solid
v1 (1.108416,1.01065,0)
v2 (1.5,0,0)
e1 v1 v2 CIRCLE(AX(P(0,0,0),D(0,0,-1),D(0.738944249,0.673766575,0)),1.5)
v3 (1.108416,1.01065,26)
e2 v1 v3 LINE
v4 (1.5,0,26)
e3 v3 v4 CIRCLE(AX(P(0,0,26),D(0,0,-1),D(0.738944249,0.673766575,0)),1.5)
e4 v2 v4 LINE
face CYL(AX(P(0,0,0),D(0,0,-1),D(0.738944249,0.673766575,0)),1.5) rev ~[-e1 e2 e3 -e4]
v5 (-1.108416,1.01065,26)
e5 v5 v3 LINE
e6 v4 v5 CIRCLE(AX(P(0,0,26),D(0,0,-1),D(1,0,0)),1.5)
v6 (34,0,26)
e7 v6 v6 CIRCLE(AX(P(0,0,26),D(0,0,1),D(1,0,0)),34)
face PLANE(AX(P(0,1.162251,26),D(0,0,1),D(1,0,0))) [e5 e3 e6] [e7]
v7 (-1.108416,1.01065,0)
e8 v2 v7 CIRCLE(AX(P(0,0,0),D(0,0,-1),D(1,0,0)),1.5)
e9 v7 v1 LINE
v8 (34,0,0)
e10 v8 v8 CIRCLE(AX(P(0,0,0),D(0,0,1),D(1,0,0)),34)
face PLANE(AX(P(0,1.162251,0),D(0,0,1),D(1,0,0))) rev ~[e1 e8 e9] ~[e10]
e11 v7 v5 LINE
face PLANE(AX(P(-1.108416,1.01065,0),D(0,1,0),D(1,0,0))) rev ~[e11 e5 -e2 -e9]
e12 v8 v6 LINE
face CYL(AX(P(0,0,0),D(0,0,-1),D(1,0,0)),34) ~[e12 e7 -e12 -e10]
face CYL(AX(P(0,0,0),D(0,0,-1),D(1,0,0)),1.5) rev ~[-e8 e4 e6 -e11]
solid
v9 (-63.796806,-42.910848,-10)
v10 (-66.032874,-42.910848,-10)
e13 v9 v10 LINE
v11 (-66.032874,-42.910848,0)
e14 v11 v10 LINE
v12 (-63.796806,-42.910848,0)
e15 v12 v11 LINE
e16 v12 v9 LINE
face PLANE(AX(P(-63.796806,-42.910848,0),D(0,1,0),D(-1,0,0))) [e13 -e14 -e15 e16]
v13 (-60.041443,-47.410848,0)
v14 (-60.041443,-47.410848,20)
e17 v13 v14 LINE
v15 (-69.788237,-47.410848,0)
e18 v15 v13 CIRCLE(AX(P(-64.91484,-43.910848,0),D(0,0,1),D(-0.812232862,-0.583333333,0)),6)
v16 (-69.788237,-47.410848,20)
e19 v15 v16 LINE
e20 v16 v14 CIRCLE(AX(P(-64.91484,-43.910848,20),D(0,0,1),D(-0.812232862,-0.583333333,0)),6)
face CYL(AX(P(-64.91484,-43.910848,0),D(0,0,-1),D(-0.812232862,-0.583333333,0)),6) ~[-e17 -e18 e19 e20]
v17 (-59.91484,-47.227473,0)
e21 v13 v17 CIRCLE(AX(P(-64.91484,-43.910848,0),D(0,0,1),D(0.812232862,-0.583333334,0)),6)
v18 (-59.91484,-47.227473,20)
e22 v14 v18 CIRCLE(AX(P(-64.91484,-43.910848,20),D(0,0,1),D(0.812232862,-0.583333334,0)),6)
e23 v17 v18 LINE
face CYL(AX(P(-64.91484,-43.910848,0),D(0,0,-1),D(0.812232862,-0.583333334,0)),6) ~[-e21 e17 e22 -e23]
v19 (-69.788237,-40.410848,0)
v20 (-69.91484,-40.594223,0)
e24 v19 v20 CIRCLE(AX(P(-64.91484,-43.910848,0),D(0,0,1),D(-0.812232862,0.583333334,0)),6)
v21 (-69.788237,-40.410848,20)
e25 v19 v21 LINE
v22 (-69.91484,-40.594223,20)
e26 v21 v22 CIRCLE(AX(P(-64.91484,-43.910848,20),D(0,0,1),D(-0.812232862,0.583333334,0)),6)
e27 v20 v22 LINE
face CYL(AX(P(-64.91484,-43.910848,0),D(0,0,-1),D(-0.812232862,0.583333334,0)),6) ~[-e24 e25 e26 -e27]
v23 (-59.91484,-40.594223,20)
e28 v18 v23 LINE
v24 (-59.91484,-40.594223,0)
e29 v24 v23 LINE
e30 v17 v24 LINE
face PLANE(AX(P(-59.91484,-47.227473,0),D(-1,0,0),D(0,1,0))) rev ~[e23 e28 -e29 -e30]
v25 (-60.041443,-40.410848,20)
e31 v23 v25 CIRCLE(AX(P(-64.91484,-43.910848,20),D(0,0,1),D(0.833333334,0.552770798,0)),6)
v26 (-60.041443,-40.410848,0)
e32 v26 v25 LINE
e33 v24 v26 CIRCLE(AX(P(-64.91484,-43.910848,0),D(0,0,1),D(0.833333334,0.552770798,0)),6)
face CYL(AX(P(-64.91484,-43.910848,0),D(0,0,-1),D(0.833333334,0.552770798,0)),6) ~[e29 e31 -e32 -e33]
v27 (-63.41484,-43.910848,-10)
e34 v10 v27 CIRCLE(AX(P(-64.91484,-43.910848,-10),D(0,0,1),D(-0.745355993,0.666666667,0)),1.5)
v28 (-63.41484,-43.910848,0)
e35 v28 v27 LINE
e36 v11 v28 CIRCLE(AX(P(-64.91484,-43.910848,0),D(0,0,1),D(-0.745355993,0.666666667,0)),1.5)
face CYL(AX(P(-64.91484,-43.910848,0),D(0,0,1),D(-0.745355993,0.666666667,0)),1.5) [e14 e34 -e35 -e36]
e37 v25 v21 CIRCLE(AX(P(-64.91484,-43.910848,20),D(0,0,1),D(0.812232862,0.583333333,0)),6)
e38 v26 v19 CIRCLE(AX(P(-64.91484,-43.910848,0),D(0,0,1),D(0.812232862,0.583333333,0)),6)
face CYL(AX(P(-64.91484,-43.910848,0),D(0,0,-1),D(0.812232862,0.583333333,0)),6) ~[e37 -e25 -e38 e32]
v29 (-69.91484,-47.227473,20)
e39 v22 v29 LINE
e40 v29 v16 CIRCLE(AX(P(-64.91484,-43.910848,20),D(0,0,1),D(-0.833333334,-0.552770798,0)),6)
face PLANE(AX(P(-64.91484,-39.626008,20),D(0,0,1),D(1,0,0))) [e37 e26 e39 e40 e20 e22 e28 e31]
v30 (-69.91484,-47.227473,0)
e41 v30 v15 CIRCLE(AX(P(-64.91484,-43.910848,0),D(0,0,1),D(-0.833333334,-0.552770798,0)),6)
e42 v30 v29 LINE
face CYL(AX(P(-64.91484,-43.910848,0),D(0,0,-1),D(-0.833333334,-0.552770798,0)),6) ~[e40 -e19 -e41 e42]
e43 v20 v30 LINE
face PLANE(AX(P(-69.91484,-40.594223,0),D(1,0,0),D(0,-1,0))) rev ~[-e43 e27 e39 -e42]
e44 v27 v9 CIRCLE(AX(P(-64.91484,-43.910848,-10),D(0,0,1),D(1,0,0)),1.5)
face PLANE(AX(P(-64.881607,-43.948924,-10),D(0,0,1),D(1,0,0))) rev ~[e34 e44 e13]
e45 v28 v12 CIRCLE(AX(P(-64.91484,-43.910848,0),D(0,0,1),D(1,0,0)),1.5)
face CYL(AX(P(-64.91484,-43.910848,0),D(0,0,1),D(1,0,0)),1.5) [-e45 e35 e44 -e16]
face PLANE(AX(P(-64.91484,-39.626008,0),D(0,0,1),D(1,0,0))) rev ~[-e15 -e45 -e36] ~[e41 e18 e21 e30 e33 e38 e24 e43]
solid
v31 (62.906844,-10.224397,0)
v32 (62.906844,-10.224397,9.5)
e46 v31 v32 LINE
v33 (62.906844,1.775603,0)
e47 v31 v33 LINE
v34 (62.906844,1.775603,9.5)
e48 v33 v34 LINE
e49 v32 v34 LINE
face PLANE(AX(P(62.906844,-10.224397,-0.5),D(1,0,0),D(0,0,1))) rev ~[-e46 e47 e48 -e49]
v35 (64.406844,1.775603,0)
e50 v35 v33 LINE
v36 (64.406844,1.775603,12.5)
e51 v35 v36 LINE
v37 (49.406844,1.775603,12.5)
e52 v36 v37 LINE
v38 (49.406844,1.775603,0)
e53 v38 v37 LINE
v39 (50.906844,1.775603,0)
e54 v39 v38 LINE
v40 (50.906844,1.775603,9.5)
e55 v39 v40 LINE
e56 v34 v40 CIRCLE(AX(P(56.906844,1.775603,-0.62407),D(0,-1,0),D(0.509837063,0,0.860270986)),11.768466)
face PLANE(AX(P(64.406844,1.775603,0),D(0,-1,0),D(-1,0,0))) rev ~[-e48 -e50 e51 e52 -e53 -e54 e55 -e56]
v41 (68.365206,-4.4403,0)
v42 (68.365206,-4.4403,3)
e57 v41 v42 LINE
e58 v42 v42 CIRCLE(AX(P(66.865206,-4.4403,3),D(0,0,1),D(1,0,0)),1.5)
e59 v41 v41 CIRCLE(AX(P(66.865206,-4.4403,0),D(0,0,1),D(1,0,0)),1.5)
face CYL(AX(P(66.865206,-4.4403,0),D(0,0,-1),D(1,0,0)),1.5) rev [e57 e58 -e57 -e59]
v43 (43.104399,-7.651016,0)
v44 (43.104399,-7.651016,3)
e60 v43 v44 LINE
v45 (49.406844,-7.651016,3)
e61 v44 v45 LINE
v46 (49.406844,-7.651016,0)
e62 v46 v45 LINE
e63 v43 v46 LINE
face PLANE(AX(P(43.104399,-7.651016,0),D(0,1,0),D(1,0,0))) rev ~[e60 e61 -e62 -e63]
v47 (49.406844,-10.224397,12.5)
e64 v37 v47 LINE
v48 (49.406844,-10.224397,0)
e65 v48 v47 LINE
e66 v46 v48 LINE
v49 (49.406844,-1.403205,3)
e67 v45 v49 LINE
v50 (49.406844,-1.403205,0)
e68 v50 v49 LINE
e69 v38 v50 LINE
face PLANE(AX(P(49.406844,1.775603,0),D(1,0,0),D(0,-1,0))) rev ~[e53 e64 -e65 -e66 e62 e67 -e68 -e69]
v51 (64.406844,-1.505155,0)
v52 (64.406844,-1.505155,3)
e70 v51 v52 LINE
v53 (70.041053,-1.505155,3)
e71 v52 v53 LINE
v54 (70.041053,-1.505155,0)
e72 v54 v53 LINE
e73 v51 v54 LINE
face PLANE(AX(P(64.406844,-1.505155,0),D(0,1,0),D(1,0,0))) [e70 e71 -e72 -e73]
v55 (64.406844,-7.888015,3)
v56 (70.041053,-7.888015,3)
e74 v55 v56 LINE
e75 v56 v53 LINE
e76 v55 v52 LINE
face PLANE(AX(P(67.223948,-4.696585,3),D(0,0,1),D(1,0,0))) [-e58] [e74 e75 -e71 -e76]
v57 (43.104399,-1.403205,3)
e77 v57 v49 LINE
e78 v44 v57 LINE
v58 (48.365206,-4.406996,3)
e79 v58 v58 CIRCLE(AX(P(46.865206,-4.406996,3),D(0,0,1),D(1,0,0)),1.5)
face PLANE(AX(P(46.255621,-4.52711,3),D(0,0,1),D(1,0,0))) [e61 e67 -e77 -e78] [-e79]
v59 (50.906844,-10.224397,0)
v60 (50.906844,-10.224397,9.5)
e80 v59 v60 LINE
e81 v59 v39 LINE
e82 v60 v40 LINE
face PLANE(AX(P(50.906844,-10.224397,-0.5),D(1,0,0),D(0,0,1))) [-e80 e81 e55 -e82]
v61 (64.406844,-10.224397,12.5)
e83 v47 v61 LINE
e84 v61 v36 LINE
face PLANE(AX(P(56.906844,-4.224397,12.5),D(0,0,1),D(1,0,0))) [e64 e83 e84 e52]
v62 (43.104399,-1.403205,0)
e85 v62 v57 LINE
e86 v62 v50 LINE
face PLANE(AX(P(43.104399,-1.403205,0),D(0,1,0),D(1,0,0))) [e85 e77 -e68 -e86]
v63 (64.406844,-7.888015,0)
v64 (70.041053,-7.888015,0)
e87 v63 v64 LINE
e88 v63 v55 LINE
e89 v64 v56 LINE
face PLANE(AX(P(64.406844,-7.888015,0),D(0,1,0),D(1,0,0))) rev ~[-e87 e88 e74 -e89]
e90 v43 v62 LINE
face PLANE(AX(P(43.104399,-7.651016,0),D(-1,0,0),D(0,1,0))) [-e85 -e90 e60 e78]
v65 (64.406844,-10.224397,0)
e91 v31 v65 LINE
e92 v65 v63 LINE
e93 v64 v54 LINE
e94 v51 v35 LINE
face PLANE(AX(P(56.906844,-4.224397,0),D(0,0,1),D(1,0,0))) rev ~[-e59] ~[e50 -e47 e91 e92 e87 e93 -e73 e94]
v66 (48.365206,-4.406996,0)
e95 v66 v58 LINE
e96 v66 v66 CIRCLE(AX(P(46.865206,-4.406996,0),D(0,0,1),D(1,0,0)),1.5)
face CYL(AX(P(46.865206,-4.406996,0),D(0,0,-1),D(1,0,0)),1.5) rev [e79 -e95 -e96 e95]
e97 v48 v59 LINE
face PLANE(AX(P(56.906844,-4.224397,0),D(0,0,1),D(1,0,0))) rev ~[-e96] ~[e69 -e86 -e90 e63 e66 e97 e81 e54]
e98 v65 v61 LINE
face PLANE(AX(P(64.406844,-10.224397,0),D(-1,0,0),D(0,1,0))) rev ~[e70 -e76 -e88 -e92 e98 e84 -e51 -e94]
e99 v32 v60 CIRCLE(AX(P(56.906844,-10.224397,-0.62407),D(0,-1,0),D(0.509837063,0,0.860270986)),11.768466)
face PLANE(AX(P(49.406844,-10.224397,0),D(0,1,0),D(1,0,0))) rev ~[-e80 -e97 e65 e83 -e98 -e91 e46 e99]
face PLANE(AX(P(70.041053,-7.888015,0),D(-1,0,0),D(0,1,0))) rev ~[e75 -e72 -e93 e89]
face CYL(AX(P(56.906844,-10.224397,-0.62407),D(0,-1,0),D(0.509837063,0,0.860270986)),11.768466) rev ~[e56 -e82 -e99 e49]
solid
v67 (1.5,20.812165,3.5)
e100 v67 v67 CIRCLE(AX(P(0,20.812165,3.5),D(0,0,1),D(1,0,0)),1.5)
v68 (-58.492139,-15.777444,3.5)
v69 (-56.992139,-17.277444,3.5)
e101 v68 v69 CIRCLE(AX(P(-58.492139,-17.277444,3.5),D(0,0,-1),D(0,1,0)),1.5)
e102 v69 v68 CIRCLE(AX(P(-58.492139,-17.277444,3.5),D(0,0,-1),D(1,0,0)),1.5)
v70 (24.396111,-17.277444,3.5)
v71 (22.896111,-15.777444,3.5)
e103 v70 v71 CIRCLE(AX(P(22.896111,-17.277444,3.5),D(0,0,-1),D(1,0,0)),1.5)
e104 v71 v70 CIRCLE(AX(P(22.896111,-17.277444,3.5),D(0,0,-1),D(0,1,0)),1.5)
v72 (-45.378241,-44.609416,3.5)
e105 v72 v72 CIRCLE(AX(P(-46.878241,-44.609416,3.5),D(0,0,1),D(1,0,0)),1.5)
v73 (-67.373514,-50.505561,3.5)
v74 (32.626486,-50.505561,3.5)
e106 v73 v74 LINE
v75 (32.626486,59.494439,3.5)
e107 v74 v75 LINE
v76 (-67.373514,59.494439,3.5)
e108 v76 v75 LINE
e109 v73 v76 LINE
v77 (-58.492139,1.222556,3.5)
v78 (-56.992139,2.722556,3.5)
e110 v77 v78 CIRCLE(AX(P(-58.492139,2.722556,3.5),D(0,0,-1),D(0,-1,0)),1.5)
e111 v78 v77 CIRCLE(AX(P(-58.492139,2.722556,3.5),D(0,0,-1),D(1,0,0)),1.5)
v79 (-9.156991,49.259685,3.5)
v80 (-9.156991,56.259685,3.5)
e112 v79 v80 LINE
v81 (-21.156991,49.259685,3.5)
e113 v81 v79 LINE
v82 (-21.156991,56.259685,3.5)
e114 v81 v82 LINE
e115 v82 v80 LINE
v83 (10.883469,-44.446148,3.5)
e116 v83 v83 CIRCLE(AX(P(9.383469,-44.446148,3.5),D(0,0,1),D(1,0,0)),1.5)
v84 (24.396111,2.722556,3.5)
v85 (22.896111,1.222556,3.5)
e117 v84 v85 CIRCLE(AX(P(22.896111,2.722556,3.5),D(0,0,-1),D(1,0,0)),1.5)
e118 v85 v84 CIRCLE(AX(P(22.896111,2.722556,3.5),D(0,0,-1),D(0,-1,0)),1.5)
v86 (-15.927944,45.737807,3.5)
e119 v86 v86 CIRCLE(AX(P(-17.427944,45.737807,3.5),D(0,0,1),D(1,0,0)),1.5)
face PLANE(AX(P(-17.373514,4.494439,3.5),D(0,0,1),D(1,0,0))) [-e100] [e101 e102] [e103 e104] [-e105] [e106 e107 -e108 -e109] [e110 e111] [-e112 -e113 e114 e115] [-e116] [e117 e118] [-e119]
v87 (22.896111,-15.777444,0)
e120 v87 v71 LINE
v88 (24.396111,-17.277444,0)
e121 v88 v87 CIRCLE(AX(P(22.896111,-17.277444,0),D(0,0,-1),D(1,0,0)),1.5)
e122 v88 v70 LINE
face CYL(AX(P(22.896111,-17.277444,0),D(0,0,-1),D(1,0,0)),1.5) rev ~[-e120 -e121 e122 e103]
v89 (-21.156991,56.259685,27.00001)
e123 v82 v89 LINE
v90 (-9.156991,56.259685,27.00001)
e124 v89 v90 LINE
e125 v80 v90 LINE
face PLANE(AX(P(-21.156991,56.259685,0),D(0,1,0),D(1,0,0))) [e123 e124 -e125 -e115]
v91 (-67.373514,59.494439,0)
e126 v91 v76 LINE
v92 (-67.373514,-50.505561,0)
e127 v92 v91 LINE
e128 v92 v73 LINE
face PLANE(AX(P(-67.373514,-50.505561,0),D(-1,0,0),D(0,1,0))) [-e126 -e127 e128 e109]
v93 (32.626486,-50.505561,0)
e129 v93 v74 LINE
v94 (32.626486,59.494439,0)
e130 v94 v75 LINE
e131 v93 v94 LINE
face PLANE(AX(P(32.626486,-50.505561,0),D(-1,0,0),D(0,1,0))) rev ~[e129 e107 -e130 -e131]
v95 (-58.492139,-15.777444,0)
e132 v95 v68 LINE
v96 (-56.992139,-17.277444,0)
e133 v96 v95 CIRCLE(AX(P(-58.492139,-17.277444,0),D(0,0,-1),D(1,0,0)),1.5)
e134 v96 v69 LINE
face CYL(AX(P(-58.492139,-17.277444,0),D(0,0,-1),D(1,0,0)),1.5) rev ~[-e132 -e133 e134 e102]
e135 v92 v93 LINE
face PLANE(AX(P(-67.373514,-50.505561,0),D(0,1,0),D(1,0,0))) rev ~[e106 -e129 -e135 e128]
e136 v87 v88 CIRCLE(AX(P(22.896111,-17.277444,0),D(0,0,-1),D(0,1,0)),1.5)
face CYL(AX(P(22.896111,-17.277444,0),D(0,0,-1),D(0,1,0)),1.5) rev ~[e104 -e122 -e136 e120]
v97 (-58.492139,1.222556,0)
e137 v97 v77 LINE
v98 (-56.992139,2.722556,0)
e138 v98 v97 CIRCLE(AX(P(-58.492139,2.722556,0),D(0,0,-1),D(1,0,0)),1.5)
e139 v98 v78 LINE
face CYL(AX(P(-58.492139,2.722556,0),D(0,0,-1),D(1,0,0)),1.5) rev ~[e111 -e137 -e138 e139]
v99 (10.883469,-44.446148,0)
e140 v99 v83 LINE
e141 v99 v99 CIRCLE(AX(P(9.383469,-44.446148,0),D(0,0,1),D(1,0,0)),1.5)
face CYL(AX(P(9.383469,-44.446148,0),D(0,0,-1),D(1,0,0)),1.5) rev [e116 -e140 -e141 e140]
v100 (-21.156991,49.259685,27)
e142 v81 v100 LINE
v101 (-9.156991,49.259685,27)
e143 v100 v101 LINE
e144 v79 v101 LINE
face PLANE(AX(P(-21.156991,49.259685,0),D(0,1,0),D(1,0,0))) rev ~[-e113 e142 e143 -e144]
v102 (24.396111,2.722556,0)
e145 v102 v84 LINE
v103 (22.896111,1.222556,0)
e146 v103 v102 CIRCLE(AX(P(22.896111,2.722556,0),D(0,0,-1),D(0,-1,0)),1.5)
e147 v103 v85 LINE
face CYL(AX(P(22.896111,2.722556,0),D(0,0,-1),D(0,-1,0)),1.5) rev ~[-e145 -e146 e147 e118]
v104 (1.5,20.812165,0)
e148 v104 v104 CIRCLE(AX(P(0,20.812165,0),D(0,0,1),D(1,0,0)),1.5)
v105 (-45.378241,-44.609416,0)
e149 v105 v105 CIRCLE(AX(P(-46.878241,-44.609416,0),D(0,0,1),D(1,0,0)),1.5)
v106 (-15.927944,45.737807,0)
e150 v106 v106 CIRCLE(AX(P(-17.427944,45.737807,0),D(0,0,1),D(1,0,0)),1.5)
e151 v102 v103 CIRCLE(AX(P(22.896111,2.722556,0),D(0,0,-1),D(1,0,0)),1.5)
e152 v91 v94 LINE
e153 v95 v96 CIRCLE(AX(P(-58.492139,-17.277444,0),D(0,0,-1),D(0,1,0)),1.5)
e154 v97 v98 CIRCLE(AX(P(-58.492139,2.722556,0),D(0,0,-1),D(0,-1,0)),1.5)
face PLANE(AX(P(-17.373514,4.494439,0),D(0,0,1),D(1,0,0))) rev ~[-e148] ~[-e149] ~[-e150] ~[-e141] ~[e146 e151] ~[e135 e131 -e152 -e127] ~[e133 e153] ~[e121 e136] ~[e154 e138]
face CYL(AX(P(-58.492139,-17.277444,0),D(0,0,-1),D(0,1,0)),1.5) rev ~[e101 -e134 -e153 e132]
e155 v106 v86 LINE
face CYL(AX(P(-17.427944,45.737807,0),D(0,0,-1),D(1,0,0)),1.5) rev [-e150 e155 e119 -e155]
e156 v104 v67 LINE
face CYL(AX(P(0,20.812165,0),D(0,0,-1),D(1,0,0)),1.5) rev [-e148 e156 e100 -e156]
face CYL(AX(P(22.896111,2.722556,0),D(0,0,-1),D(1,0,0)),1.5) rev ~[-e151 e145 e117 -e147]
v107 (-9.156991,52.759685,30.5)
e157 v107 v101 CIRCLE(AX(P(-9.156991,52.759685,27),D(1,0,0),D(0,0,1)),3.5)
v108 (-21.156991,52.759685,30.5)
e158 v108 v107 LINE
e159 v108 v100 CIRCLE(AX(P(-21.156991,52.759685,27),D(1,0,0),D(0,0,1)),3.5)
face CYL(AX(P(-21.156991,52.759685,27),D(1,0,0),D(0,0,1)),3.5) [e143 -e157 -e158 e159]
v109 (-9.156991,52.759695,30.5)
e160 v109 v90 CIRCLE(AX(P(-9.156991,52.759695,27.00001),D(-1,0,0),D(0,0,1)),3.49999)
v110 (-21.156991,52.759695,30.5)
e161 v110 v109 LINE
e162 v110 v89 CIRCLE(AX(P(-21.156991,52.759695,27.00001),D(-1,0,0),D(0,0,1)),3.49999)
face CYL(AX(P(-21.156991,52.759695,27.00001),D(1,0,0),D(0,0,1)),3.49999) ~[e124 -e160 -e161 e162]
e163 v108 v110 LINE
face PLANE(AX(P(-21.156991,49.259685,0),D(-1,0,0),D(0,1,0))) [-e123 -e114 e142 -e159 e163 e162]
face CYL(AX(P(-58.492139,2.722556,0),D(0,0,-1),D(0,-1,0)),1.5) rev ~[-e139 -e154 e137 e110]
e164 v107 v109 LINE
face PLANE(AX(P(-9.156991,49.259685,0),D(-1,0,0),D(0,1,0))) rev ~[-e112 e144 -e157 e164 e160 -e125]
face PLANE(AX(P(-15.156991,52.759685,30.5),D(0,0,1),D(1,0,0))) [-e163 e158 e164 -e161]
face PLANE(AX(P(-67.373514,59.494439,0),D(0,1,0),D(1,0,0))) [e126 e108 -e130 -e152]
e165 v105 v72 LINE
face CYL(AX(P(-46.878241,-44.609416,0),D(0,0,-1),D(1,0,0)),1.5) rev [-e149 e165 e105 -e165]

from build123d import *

# Parameters (mm, degrees)
F0_R      = 34
F1_DEPTH  = 26
F2_DEPTH  = 26
F4_DEPTH  = 20
F5_DEPTH  = 20
F6_DEPTH  = 20
F7_DEPTH  = 10
F8_W      = 100
F8_H      = 110
F8_R      = 1.5
F8_W_2    = 12
F8_H_2    = 7
F9_DEPTH  = 3.5
F10_DEPTH = 30.5
F11_R     = 3.5
F12_R     = 3.49999
F14_DEPTH = 12.5
F13_W     = 6.3024445623
F13_H     = 6.2478113687
F13_R     = 1.5
F15_DEPTH = 3
F13_W_2   = 5.6342094392
F13_H_2   = 6.382860709
F16_DEPTH = 3
F17_W     = 12
F17_H     = 10
F18_DEPTH = 25


# Not quite as in the source:
# - a fillet or chamfer is up to 0.001 mm smaller than in the source, because OpenCascade refuses the exact size


with BuildPart() as f1:
    # F0 (on Top) → F1 (new body)
    with BuildSketch(Plane.XY):
        Circle(F0_R)
        with BuildLine():
            ThreePointArc((1.1084163734, 1.0106498618), (1.3986823371, 0.5419296264), (1.5, 0))
            ThreePointArc((1.5, 0), (-0.5419296264, -1.3986823371), (-1.1084163734, 1.0106498618))
            ThreePointArc((-1.1084163734, 1.0106498618), (0, 1.5), (1.1084163734, 1.0106498618))
        make_face(mode=Mode.SUBTRACT)
    extrude(amount=F1_DEPTH)

    # F0 (on Top) → F2 (join)
    with BuildSketch(Plane.XY):
        with BuildLine():
            Line((-1.1084163734, 1.0106498618), (1.1084163734, 1.0106498618))
            ThreePointArc((1.1084163734, 1.0106498618), (0, 1.5), (-1.1084163734, 1.0106498618))
        make_face()
    extrude(amount=F2_DEPTH)


with BuildPart() as f4:
    # F3 (on Top) → F4 (new body)
    with BuildSketch(Plane.XY):
        with BuildLine():
            Line((-69.9148401618, -40.5942231864), (-69.9148401618, -47.2274727672))
            ThreePointArc((-69.9148401618, -47.2274727672), (-69.8523901158, -47.319748159), (-69.7882373342, -47.4108479768))
            Line((-69.7882373342, -47.4108479768), (-60.0414429894, -47.4108479768))
            ThreePointArc((-60.0414429894, -47.4108479768), (-59.9772902078, -47.319748159), (-59.9148401618, -47.2274727672))
            Line((-59.9148401618, -47.2274727672), (-59.9148401618, -40.5942231864))
            ThreePointArc((-59.9148401618, -40.5942231864), (-59.9772902078, -40.5019477946), (-60.0414429894, -40.4108479768))
            Line((-60.0414429894, -40.4108479768), (-69.7882373342, -40.4108479768))
            ThreePointArc((-69.7882373342, -40.4108479768), (-69.8523901158, -40.5019477946), (-69.9148401618, -40.5942231864))
        make_face()
        with BuildLine():
            ThreePointArc((-63.7968061731, -42.9108479768), (-63.5135816234, -43.3756148421), (-63.4148401618, -43.9108479768))
            ThreePointArc((-63.4148401618, -43.9108479768), (-65.4500732965, -45.3121065152), (-66.0328741506, -42.9108479768))
            ThreePointArc((-66.0328741506, -42.9108479768), (-64.9148401618, -42.4108479768), (-63.7968061731, -42.9108479768))
        make_face(mode=Mode.SUBTRACT)
    extrude(amount=F4_DEPTH)

    # F3 (on Top) → F5 (join)
    with BuildSketch(Plane.XY):
        with BuildLine():
            Line((-60.0414429894, -47.4108479768), (-69.7882373342, -47.4108479768))
            ThreePointArc((-69.7882373342, -47.4108479768), (-64.9148401618, -49.9108479768), (-60.0414429894, -47.4108479768))
        make_face()
        with BuildLine():
            Line((-66.0328741506, -42.9108479768), (-63.7968061731, -42.9108479768))
            ThreePointArc((-63.7968061731, -42.9108479768), (-64.9148401618, -42.4108479768), (-66.0328741506, -42.9108479768))
        make_face()
        with BuildLine():
            ThreePointArc((-66.0328741506, -42.9108479768), (-65.4500732965, -45.3121065152), (-63.4148401618, -43.9108479768))
            ThreePointArc((-63.4148401618, -43.9108479768), (-63.5135816234, -43.3756148421), (-63.7968061731, -42.9108479768))
            Line((-63.7968061731, -42.9108479768), (-66.0328741506, -42.9108479768))
        make_face()
    extrude(amount=F5_DEPTH)

    # F3 (on Top) → F6 (join)
    with BuildSketch(Plane.XY):
        with BuildLine():
            ThreePointArc((-60.0414429894, -40.4108479768), (-64.9148401618, -37.9108479768), (-69.7882373342, -40.4108479768))
            Line((-69.7882373342, -40.4108479768), (-60.0414429894, -40.4108479768))
        make_face()
    extrude(amount=F6_DEPTH)

    # F3 (on Top) → F7 (join)
    with BuildSketch(Plane.XY):
        with BuildLine():
            ThreePointArc((-66.0328741506, -42.9108479768), (-65.4500732965, -45.3121065152), (-63.4148401618, -43.9108479768))
            ThreePointArc((-63.4148401618, -43.9108479768), (-63.5135816234, -43.3756148421), (-63.7968061731, -42.9108479768))
            Line((-63.7968061731, -42.9108479768), (-66.0328741506, -42.9108479768))
        make_face()
    extrude(amount=-F7_DEPTH)


with BuildPart() as f9:
    # F8 (on Top) → F9 (new body)
    with BuildSketch(Plane.XY):
        with Locations((-17.3735144734, 4.4944389339)):
            Rectangle(F8_W, F8_H)
        with Locations((-46.8782410026, -44.6094162762)):
            Circle(F8_R, mode=Mode.SUBTRACT)
        with BuildLine():
            ThreePointArc((-58.4921389818, -15.7774437815), (-57.43147881, -16.2167836097), (-56.9921389818, -17.2774437815))
            ThreePointArc((-56.9921389818, -17.2774437815), (-59.5527991536, -18.3381039533), (-58.4921389818, -15.7774437815))
        make_face(mode=Mode.SUBTRACT)
        with BuildLine():
            ThreePointArc((-56.9921389818, 2.7225562185), (-57.43147881, 1.6618960467), (-58.4921389818, 1.2225562185))
            ThreePointArc((-58.4921389818, 1.2225562185), (-59.5527991536, 3.7832163903), (-56.9921389818, 2.7225562185))
        make_face(mode=Mode.SUBTRACT)
        with Locations((9.3834688887, -44.4461479783)):
            Circle(F8_R, mode=Mode.SUBTRACT)
        with BuildLine():
            ThreePointArc((24.3961110115, -17.2774437815), (21.8354508397, -18.3381039533), (22.8961110115, -15.7774437815))
            ThreePointArc((22.8961110115, -15.7774437815), (23.9567711833, -16.2167836097), (24.3961110115, -17.2774437815))
        make_face(mode=Mode.SUBTRACT)
        with BuildLine():
            ThreePointArc((24.3961110115, 2.7225562185), (23.9567711833, 1.6618960467), (22.8961110115, 1.2225562185))
            ThreePointArc((22.8961110115, 1.2225562185), (21.8354508397, 3.7832163903), (24.3961110115, 2.7225562185))
        make_face(mode=Mode.SUBTRACT)
        with Locations((-17.4279436469, 45.7378067076)):
            Circle(F8_R, mode=Mode.SUBTRACT)
        with Locations((0, 20.8121649921)):
            Circle(F8_R, mode=Mode.SUBTRACT)
        with Locations((-15.1569909006, 52.7596849799)):
            Rectangle(F8_W_2, F8_H_2, mode=Mode.SUBTRACT)
    extrude(amount=F9_DEPTH)

    # F8 (on Top) → F10 (join)
    with BuildSketch(Plane.XY):
        with Locations((-15.1569909006, 52.7596849799)):
            Rectangle(F8_W_2, F8_H_2)
    extrude(amount=F10_DEPTH)

    # F11
    f11_edges = [f9.edges().sort_by_distance(p)[0] for p in [
        (-15.156991, 49.259685, 30.5),
    ]]
    fillet(f11_edges, radius=F11_R)

    # F12 (radius 3.5 in the source; OpenCascade refuses exactly that, so slightly less here)
    f12_edges = [f9.edges().sort_by_distance(p)[0] for p in [
        (-15.156991, 56.259685, 30.5),
    ]]
    fillet(f12_edges, radius=F12_R)


with BuildPart() as f14:
    # F13 (on Top) → F14 (new body)
    with BuildSketch(Plane.XY):
        Polygon((64.406843558, 1.7756032334), (49.406843558, 1.7756032334), (49.406843558, -1.4032047475), (49.406843558, -7.6510161161), (49.406843558, -10.2243967666), (64.406843558, -10.2243967666), (64.406843558, -7.8880153596), (64.406843558, -1.5051546507), align=None)
    extrude(amount=F14_DEPTH)

    # F13 (on Top) → F15 (join)
    with BuildSketch(Plane.XY):
        with Locations((46.2556212768, -4.5271104318)):
            Rectangle(F13_W, F13_H)
        with Locations((46.8652057648, -4.4069956057)):
            Circle(F13_R, mode=Mode.SUBTRACT)
    extrude(amount=F15_DEPTH)

    # F13 (on Top) → F16 (join)
    with BuildSketch(Plane.XY):
        with Locations((67.2239482775, -4.6965850051)):
            Rectangle(F13_W_2, F13_H_2)
        with Locations((66.8652057648, -4.4403001666)):
            Circle(F13_R, mode=Mode.SUBTRACT)
    extrude(amount=F16_DEPTH)

    # F17 (on face) → F18 (cut)
    with BuildSketch(Plane.XZ.offset(10.2243967666)):
        with BuildLine():
            ThreePointArc((62.906843558, 9.5), (56.906843558, 11.1443961122), (50.906843558, 9.5))
            Line((50.906843558, 9.5), (62.906843558, 9.5))
        make_face()
        with Locations((56.906843558, 4.5)):
            Rectangle(F17_W, F17_H)
    extrude(amount=-F18_DEPTH, mode=Mode.SUBTRACT)


solid = Compound([f1.part, f4.part, f9.part, f14.part])
